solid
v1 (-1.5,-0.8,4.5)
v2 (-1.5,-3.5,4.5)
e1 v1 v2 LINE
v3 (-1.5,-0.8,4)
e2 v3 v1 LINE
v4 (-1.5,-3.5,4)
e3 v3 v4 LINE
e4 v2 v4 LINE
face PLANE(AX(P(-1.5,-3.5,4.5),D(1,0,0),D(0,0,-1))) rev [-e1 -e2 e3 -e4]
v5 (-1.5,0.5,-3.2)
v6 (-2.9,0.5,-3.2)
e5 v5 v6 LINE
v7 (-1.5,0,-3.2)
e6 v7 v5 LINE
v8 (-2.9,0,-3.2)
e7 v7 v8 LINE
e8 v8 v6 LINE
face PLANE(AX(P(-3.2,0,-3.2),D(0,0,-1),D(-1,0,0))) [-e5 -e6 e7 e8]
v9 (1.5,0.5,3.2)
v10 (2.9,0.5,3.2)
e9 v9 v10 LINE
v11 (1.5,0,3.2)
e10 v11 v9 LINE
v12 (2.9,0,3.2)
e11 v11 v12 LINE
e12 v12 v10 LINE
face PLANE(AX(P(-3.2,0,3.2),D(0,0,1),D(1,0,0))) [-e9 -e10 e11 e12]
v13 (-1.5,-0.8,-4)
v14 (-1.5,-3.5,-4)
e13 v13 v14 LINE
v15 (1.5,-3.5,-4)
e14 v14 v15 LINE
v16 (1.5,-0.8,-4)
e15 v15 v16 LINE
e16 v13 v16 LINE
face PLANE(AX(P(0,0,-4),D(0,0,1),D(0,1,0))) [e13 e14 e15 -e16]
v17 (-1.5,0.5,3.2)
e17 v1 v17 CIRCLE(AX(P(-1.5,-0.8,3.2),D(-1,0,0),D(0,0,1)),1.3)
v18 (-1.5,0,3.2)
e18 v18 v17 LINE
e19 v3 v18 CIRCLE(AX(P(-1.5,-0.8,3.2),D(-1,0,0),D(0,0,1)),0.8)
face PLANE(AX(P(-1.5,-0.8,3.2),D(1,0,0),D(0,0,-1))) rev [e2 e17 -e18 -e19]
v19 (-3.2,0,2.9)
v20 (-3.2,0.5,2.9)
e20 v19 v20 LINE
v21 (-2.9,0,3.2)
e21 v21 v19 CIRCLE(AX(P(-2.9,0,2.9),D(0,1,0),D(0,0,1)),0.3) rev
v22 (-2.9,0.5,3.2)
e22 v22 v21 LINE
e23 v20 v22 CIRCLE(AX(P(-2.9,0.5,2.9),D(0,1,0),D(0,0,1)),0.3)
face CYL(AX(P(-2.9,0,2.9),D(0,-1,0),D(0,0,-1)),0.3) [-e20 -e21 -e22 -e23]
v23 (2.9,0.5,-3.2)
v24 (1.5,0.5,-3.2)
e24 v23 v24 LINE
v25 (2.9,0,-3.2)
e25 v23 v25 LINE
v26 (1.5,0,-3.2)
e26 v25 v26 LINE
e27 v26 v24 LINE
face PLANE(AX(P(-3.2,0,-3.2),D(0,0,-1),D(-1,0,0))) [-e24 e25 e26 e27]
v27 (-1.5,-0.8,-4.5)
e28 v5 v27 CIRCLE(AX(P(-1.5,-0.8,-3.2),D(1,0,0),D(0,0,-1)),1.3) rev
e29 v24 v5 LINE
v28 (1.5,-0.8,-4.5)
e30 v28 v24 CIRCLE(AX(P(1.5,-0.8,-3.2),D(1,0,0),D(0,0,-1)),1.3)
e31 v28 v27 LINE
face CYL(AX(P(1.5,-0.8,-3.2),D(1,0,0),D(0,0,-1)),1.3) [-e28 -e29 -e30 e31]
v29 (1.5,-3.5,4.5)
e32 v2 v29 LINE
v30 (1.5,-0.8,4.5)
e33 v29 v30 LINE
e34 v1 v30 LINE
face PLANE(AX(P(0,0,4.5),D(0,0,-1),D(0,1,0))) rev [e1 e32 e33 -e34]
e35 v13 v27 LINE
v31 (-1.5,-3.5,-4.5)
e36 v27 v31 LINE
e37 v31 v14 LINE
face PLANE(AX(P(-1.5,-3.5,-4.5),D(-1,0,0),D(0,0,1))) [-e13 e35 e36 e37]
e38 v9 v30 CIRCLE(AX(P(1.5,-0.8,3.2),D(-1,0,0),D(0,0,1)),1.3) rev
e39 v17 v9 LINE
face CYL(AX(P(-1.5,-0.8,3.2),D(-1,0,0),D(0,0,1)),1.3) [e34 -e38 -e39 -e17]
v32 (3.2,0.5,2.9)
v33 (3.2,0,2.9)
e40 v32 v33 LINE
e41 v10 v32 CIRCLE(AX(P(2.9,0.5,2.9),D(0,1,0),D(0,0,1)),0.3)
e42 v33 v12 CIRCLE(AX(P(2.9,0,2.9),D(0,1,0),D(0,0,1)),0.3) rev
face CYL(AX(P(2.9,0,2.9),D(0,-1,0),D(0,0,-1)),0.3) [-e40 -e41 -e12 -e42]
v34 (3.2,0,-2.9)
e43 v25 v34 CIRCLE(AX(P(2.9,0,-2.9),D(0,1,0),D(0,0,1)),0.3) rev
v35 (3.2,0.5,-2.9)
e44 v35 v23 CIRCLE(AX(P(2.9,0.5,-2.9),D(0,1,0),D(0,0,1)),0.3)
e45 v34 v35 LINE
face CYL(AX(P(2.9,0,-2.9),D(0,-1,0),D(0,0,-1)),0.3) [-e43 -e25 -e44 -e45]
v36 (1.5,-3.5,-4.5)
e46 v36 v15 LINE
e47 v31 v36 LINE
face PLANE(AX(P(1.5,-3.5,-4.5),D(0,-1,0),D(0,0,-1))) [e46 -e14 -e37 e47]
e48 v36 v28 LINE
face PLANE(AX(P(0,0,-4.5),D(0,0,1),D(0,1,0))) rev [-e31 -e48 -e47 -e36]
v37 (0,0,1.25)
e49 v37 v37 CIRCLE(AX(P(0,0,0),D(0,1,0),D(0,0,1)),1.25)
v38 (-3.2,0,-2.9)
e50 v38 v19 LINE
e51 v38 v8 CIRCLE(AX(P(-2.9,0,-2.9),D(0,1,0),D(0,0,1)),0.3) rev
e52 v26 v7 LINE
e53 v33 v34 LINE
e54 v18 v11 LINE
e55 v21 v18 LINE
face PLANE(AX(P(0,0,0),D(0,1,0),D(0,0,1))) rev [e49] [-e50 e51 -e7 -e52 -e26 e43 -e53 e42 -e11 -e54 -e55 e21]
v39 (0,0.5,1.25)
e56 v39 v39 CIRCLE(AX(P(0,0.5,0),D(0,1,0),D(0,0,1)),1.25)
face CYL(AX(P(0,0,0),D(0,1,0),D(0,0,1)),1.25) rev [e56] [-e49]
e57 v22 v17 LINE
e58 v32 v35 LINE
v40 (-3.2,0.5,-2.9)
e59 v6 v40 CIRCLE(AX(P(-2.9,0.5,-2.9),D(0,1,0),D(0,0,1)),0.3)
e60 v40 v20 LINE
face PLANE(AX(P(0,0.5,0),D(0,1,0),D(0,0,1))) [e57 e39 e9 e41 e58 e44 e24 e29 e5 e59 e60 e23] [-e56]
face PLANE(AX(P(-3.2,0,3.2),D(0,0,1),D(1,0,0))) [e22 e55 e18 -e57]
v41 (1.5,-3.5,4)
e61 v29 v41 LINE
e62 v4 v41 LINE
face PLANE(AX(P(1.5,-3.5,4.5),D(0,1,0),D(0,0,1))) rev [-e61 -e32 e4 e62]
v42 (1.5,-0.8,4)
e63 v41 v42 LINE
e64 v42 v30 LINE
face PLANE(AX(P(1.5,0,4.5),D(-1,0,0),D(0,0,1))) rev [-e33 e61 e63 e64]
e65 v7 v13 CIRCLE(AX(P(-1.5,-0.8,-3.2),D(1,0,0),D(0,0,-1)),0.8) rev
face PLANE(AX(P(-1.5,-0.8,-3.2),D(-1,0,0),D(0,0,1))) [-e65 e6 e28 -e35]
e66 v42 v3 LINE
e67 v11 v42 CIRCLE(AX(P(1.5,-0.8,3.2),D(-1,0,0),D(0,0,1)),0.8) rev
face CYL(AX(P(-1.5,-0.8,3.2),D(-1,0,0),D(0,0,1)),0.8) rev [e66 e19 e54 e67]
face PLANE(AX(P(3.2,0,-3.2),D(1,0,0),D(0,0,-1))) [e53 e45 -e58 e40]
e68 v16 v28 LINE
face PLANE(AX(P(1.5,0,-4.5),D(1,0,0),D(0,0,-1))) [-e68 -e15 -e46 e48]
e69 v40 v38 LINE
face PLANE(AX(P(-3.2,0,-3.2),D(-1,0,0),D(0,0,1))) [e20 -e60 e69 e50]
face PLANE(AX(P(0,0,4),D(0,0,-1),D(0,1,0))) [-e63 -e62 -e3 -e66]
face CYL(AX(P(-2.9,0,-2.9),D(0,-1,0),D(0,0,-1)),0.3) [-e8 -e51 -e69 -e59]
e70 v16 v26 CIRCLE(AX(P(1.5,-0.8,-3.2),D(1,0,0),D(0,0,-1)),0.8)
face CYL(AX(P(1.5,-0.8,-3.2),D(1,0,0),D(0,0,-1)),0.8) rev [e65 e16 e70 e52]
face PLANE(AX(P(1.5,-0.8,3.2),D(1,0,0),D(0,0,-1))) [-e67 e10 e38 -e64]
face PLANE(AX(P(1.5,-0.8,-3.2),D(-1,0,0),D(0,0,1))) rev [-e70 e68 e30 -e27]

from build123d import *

# Parameters (mm, degrees)
SKETCH1_W             = 6.4
SKETCH1_H             = 6.4
BOSS_EXTRUDE1_DEPTH   = 0.5
M3X0_5_TAPPED_HOLE1_D = 2.5
EDGE_FLANGE1_DEPTH    = 3
FILLET1_R             = 0.3


# Sheet-metal steps are written as plain solids
with BuildPart() as part:
    # Sketch1 → Boss-Extrude1 (new body)
    with BuildSketch(Plane(origin=(0, 0, 0), x_dir=(1, 0, 0), z_dir=(0, 1, 0))):
        Rectangle(SKETCH1_W, SKETCH1_H)
    extrude(amount=BOSS_EXTRUDE1_DEPTH)

    # M3x0.5 Tapped Hole1 (through all)
    with Locations(Plane(origin=(0, 0.5, 0), x_dir=(1, 0, 0), z_dir=(0, 1, 0))):
        with Locations((0, 0)):
            Hole(M3X0_5_TAPPED_HOLE1_D / 2)

    # Edge-Flange1 section (across the edge) → Edge-Flange1 (add)
    with BuildSketch(Plane(origin=(1.5, 0, 4), x_dir=(0, 0, -1), z_dir=(-1, 0, 0))):
        with BuildLine():
            Line((-0.5, 0.8), (-0.5, 3.5))
            Line((-0.5, 3.5), (0, 3.5))
            Line((0, 3.5), (0, 0.8))
            ThreePointArc((0, 0.8), (0.234314575, 0.234314575), (0.8, 0))
            Line((0.8, 0), (0.8, -0.5))
            ThreePointArc((0.8, -0.5), (-0.119238816, -0.119238816), (-0.5, 0.8))
        make_face()
    edge_flange1 = extrude(amount=EDGE_FLANGE1_DEPTH)

    # Mirror1: Edge-Flange1 across plane
    add(edge_flange1.mirror(Plane.XY))

    # Fillet1
    fillet1_edges = [part.edges().sort_by_distance(p)[0] for p in [
        (-3.2, 0.25, 3.2),
        (3.2, 0.25, 3.2),
        (3.2, 0.25, -3.2),
        (-3.2, 0.25, -3.2),
    ]]
    fillet(fillet1_edges, radius=FILLET1_R)


solid = part.part
